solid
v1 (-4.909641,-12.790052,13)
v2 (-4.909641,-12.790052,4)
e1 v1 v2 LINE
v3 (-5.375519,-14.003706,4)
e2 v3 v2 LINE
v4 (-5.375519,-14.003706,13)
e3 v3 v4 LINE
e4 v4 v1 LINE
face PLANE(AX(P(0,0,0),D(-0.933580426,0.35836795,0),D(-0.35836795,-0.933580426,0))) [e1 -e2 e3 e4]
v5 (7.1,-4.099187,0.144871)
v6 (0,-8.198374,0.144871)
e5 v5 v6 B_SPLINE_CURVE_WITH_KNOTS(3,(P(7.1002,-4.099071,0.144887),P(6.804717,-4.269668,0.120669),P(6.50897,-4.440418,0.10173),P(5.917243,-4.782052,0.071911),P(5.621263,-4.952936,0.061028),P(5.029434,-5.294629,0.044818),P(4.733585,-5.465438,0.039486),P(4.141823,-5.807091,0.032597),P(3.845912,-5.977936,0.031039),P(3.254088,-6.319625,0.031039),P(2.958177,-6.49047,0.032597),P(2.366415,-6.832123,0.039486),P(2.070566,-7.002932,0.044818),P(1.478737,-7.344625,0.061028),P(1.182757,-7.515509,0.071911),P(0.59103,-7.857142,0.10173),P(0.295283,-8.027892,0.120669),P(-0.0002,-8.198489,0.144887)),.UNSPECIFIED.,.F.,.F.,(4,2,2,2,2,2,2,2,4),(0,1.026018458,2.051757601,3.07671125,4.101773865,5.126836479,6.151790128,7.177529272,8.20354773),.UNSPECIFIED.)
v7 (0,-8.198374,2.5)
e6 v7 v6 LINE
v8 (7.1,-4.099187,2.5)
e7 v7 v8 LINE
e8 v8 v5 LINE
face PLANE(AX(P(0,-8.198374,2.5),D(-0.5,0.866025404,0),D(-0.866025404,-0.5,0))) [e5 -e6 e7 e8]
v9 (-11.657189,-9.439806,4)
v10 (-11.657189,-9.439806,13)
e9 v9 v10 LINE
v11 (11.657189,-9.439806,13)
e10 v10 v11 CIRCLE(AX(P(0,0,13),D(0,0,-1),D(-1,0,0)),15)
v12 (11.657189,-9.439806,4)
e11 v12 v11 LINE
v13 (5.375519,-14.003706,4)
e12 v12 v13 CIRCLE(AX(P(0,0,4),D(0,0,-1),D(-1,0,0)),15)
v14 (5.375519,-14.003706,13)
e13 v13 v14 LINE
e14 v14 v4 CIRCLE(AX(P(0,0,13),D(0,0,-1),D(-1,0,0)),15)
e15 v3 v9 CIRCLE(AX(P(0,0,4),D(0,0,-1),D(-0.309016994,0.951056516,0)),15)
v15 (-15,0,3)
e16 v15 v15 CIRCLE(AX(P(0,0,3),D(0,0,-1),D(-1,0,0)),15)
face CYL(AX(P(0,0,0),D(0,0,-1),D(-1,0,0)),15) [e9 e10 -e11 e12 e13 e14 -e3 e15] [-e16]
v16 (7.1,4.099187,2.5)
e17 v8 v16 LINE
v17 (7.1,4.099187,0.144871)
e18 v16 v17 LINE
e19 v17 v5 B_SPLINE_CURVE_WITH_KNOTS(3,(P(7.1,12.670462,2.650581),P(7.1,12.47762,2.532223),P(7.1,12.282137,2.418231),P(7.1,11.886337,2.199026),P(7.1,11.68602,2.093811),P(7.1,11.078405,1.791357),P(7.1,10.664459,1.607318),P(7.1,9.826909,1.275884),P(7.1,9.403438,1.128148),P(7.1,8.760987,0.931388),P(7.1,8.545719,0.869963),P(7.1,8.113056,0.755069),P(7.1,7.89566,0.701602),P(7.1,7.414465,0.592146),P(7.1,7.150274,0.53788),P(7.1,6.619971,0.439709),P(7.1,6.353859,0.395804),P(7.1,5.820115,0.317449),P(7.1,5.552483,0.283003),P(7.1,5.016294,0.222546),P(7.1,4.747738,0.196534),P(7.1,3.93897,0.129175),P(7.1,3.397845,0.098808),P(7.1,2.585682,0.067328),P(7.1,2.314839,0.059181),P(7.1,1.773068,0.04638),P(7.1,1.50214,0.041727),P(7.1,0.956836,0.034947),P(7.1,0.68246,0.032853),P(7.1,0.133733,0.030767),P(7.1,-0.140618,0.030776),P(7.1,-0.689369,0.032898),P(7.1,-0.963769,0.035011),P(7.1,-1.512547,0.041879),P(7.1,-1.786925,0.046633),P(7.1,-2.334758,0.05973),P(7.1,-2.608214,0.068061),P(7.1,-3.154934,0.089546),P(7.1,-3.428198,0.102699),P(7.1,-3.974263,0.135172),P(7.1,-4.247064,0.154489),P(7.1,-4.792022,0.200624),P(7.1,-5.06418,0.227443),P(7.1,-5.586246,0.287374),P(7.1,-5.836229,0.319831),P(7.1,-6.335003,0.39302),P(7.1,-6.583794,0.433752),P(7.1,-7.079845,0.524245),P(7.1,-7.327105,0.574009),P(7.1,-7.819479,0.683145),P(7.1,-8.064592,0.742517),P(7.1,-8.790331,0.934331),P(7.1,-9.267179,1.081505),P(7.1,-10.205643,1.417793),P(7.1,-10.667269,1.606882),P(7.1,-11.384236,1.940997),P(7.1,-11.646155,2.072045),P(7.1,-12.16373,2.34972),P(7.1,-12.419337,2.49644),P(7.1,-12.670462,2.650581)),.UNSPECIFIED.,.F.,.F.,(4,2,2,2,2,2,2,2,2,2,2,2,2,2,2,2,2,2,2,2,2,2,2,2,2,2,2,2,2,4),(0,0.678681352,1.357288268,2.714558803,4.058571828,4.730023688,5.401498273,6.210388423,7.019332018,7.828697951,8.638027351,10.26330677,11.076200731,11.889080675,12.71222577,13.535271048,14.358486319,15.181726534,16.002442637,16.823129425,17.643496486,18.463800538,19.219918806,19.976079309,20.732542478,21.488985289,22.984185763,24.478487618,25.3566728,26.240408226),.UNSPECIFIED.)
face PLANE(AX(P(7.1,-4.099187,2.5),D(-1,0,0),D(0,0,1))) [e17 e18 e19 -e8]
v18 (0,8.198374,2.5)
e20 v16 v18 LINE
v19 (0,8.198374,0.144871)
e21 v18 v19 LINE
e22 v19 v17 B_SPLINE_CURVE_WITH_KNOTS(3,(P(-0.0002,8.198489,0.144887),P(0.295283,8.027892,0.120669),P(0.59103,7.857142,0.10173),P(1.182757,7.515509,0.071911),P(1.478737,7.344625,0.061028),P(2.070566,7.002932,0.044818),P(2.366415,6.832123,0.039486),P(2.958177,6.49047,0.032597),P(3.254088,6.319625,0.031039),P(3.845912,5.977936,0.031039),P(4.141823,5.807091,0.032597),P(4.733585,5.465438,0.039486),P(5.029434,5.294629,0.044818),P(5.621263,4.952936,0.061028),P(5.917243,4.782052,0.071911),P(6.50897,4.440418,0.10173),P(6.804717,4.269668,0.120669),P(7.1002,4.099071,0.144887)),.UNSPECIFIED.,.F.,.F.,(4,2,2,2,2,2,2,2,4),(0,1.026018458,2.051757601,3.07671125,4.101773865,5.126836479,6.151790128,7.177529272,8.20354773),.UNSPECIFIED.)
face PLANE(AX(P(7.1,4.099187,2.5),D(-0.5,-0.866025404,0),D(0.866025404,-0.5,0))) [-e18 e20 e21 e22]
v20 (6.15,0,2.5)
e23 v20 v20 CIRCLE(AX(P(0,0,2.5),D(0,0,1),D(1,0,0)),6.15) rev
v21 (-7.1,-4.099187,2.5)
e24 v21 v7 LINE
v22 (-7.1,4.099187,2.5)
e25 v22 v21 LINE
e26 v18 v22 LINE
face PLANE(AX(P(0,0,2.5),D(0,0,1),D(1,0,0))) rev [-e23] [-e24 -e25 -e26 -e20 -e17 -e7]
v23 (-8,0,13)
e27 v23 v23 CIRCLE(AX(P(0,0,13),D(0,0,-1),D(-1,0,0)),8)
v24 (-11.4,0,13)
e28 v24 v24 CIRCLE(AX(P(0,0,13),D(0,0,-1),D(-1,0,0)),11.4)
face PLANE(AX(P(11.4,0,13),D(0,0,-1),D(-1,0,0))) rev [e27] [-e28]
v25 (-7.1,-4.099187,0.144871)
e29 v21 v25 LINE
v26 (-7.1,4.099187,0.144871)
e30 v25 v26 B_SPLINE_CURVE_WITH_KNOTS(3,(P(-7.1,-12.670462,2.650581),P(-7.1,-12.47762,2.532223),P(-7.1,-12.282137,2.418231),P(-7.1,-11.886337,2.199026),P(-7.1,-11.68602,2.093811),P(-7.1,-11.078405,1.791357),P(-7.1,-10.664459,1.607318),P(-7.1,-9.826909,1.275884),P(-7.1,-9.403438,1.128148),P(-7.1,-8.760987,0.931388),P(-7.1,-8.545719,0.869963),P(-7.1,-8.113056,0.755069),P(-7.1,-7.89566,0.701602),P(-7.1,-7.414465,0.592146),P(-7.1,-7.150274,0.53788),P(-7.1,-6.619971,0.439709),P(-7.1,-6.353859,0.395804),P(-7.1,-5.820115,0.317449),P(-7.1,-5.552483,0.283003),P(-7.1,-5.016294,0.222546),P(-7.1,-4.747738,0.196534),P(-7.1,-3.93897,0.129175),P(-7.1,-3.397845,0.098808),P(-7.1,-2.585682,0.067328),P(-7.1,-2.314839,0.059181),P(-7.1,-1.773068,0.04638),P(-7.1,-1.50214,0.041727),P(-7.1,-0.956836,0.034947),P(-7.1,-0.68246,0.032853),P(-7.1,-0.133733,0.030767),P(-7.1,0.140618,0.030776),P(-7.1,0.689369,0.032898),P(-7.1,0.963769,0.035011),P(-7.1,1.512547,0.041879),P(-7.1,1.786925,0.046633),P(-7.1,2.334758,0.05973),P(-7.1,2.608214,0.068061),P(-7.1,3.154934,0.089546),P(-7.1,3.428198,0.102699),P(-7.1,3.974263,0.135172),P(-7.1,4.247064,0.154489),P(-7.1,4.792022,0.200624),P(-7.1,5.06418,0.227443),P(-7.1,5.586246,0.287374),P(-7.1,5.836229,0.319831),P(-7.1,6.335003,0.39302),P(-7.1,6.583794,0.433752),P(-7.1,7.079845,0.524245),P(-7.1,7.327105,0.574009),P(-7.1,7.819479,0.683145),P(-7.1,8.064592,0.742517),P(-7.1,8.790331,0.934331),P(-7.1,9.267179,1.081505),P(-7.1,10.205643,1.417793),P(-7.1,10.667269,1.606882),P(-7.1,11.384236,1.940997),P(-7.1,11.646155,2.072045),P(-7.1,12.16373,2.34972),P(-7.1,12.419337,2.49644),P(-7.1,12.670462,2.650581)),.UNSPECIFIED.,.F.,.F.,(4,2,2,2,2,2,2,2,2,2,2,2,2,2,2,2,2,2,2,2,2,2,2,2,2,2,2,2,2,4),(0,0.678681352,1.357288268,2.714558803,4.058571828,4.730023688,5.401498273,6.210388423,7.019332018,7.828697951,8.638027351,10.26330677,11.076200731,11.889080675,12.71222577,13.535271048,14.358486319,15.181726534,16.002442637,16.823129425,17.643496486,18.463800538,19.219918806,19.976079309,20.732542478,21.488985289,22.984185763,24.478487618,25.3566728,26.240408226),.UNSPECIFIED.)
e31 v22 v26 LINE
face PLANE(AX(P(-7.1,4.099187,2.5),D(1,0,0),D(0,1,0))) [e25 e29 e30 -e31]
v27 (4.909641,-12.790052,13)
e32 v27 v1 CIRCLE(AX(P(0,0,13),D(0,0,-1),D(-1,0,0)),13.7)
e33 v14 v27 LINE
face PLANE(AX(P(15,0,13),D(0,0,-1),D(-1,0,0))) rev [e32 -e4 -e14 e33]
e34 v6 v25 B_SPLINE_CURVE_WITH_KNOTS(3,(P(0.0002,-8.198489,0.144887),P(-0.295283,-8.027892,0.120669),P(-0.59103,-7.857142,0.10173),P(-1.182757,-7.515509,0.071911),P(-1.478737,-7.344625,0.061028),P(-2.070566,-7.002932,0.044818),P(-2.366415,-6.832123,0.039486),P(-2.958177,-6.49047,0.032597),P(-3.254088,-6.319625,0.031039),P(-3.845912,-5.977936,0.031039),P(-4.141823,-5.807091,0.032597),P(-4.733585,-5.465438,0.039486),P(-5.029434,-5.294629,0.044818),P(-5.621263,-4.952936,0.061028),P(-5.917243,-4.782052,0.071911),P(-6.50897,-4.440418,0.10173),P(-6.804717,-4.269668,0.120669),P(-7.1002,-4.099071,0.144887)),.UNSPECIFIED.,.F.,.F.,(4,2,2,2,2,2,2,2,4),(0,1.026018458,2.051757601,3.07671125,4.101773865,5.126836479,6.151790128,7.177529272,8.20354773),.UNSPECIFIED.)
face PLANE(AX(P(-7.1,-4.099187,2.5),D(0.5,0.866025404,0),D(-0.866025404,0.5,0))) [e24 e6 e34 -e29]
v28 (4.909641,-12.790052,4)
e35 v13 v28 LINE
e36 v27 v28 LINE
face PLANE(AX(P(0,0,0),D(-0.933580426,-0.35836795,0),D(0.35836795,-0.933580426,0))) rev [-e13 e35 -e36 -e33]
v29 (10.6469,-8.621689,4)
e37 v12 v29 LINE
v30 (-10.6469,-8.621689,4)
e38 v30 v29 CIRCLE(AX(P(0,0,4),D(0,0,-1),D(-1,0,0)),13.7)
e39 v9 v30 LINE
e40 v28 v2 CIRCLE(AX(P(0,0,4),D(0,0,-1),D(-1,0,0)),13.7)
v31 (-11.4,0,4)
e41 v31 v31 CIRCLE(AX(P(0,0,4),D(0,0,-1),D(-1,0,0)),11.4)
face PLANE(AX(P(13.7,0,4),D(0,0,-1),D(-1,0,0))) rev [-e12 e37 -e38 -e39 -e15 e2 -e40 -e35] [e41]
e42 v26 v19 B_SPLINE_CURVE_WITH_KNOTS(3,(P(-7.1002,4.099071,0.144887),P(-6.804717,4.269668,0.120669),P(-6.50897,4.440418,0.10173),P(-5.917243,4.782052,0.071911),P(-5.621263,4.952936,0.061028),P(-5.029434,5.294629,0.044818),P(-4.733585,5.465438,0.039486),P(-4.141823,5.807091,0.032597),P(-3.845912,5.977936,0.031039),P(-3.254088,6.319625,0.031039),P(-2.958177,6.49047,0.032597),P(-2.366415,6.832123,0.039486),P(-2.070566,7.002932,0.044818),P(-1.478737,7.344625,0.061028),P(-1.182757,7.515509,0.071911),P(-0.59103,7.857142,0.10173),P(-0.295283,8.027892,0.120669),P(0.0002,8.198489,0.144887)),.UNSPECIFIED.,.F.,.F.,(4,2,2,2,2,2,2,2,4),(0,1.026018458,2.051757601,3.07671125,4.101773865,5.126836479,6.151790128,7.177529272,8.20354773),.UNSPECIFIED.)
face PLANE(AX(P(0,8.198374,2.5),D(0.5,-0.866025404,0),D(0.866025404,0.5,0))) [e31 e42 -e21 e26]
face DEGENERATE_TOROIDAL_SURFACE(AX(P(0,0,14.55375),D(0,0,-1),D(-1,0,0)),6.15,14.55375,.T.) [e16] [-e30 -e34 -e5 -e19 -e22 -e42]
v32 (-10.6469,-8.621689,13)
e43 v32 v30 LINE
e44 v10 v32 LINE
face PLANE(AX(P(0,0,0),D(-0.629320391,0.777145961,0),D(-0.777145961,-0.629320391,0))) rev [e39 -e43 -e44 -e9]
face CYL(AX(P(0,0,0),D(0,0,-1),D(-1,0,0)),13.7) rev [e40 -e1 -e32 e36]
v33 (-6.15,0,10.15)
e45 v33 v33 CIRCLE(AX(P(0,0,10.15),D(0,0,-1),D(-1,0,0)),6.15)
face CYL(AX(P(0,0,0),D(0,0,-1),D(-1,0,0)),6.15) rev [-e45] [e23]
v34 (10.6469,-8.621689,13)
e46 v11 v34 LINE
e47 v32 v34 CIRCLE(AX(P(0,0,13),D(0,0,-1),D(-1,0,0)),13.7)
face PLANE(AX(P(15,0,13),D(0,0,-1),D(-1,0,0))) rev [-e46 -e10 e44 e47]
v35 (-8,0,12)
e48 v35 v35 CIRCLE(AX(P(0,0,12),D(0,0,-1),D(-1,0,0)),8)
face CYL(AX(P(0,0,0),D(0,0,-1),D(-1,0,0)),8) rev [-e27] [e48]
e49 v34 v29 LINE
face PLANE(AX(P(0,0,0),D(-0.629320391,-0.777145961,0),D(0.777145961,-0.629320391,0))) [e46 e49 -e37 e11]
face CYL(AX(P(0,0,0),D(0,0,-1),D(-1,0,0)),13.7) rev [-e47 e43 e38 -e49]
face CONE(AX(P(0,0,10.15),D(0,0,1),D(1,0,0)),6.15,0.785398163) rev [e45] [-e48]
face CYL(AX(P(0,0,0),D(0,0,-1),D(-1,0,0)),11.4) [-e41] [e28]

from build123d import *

# Parameters (mm, degrees)
CUT_EXTRUDE4_DEPTH = 2.5
CUT_REVOLVE1_START = 4
CUT_REVOLVE1_DEPTH = 9
CIRPATTERN1_COUNT  = 5


# Read off the part's stored shape, not the designer's step: Cut-Revolve1
with BuildPart() as part:
    # Sketch1 → Revolve1 (revolve)
    with BuildSketch(Plane(origin=(0, 0, 0), x_dir=(1, 0, 0), z_dir=(0, 1, 0)), mode=Mode.PRIVATE) as revolve1_sk:
        with BuildLine():
            Line((6.15, -10.15), (6.15, 0))
            ThreePointArc((6.15, 0), (10.822325438, -0.770389957), (15, -3))
            Line((15, -3), (15, -13))
            Line((15, -13), (13.7, -13))
            Line((13.7, -13), (13.7, -4))
            Line((13.7, -4), (11.4, -4))
            Line((11.4, -4), (11.4, -13))
            Line((11.4, -13), (8, -13))
            Line((8, -13), (8, -12))
            Line((8, -12), (6.15, -10.15))
        make_face()
    revolve(revolve1_sk.sketch.rotate(Axis((0, 0, 0), (0, 0, 1)), 180), axis=Axis((0, 0, 0), (0, 0, 1)))

    # Sketch7 → Cut-Extrude4 (cut)
    with BuildSketch(Plane.XY):
        Polygon((0, -8.198373822), (7.1, -4.099186911), (7.1, 4.099186911), (0, 8.198373822), (-7.1, 4.099186911), (-7.1, -4.099186911), align=None)
    extrude(amount=CUT_EXTRUDE4_DEPTH, mode=Mode.SUBTRACT)

    # Cut-Revolve1 outline → Cut-Revolve1 (cut)
    with BuildSketch(Plane.XY.offset(CUT_REVOLVE1_START)):
        with BuildLine():
            Line((11.657189422, -9.439805866), (10.646899672, -8.621689357))
            ThreePointArc((10.646899672, -8.621689357), (8.052657957, -11.083532823), (4.909640909, -12.790051843))
            Line((4.909640909, -12.790051843), (5.375519243, -14.003706397))
            ThreePointArc((5.375519243, -14.003706397), (8.816778784, -12.135254916), (11.657189422, -9.439805866))
        make_face()
    cut_revolve1 = extrude(amount=CUT_REVOLVE1_DEPTH, mode=Mode.SUBTRACT)

    # CirPattern1: Cut-Revolve1 ×5 about axis, 3 skipped
    cirpattern1_axis = Axis((0, 0, -1.227748989), (0, 0, 1))
    add([cut_revolve1.rotate(cirpattern1_axis, i * 360 / CIRPATTERN1_COUNT) for i in range(1, CIRPATTERN1_COUNT) if i not in (1, 2, 3)], mode=Mode.SUBTRACT)


solid = part.part
